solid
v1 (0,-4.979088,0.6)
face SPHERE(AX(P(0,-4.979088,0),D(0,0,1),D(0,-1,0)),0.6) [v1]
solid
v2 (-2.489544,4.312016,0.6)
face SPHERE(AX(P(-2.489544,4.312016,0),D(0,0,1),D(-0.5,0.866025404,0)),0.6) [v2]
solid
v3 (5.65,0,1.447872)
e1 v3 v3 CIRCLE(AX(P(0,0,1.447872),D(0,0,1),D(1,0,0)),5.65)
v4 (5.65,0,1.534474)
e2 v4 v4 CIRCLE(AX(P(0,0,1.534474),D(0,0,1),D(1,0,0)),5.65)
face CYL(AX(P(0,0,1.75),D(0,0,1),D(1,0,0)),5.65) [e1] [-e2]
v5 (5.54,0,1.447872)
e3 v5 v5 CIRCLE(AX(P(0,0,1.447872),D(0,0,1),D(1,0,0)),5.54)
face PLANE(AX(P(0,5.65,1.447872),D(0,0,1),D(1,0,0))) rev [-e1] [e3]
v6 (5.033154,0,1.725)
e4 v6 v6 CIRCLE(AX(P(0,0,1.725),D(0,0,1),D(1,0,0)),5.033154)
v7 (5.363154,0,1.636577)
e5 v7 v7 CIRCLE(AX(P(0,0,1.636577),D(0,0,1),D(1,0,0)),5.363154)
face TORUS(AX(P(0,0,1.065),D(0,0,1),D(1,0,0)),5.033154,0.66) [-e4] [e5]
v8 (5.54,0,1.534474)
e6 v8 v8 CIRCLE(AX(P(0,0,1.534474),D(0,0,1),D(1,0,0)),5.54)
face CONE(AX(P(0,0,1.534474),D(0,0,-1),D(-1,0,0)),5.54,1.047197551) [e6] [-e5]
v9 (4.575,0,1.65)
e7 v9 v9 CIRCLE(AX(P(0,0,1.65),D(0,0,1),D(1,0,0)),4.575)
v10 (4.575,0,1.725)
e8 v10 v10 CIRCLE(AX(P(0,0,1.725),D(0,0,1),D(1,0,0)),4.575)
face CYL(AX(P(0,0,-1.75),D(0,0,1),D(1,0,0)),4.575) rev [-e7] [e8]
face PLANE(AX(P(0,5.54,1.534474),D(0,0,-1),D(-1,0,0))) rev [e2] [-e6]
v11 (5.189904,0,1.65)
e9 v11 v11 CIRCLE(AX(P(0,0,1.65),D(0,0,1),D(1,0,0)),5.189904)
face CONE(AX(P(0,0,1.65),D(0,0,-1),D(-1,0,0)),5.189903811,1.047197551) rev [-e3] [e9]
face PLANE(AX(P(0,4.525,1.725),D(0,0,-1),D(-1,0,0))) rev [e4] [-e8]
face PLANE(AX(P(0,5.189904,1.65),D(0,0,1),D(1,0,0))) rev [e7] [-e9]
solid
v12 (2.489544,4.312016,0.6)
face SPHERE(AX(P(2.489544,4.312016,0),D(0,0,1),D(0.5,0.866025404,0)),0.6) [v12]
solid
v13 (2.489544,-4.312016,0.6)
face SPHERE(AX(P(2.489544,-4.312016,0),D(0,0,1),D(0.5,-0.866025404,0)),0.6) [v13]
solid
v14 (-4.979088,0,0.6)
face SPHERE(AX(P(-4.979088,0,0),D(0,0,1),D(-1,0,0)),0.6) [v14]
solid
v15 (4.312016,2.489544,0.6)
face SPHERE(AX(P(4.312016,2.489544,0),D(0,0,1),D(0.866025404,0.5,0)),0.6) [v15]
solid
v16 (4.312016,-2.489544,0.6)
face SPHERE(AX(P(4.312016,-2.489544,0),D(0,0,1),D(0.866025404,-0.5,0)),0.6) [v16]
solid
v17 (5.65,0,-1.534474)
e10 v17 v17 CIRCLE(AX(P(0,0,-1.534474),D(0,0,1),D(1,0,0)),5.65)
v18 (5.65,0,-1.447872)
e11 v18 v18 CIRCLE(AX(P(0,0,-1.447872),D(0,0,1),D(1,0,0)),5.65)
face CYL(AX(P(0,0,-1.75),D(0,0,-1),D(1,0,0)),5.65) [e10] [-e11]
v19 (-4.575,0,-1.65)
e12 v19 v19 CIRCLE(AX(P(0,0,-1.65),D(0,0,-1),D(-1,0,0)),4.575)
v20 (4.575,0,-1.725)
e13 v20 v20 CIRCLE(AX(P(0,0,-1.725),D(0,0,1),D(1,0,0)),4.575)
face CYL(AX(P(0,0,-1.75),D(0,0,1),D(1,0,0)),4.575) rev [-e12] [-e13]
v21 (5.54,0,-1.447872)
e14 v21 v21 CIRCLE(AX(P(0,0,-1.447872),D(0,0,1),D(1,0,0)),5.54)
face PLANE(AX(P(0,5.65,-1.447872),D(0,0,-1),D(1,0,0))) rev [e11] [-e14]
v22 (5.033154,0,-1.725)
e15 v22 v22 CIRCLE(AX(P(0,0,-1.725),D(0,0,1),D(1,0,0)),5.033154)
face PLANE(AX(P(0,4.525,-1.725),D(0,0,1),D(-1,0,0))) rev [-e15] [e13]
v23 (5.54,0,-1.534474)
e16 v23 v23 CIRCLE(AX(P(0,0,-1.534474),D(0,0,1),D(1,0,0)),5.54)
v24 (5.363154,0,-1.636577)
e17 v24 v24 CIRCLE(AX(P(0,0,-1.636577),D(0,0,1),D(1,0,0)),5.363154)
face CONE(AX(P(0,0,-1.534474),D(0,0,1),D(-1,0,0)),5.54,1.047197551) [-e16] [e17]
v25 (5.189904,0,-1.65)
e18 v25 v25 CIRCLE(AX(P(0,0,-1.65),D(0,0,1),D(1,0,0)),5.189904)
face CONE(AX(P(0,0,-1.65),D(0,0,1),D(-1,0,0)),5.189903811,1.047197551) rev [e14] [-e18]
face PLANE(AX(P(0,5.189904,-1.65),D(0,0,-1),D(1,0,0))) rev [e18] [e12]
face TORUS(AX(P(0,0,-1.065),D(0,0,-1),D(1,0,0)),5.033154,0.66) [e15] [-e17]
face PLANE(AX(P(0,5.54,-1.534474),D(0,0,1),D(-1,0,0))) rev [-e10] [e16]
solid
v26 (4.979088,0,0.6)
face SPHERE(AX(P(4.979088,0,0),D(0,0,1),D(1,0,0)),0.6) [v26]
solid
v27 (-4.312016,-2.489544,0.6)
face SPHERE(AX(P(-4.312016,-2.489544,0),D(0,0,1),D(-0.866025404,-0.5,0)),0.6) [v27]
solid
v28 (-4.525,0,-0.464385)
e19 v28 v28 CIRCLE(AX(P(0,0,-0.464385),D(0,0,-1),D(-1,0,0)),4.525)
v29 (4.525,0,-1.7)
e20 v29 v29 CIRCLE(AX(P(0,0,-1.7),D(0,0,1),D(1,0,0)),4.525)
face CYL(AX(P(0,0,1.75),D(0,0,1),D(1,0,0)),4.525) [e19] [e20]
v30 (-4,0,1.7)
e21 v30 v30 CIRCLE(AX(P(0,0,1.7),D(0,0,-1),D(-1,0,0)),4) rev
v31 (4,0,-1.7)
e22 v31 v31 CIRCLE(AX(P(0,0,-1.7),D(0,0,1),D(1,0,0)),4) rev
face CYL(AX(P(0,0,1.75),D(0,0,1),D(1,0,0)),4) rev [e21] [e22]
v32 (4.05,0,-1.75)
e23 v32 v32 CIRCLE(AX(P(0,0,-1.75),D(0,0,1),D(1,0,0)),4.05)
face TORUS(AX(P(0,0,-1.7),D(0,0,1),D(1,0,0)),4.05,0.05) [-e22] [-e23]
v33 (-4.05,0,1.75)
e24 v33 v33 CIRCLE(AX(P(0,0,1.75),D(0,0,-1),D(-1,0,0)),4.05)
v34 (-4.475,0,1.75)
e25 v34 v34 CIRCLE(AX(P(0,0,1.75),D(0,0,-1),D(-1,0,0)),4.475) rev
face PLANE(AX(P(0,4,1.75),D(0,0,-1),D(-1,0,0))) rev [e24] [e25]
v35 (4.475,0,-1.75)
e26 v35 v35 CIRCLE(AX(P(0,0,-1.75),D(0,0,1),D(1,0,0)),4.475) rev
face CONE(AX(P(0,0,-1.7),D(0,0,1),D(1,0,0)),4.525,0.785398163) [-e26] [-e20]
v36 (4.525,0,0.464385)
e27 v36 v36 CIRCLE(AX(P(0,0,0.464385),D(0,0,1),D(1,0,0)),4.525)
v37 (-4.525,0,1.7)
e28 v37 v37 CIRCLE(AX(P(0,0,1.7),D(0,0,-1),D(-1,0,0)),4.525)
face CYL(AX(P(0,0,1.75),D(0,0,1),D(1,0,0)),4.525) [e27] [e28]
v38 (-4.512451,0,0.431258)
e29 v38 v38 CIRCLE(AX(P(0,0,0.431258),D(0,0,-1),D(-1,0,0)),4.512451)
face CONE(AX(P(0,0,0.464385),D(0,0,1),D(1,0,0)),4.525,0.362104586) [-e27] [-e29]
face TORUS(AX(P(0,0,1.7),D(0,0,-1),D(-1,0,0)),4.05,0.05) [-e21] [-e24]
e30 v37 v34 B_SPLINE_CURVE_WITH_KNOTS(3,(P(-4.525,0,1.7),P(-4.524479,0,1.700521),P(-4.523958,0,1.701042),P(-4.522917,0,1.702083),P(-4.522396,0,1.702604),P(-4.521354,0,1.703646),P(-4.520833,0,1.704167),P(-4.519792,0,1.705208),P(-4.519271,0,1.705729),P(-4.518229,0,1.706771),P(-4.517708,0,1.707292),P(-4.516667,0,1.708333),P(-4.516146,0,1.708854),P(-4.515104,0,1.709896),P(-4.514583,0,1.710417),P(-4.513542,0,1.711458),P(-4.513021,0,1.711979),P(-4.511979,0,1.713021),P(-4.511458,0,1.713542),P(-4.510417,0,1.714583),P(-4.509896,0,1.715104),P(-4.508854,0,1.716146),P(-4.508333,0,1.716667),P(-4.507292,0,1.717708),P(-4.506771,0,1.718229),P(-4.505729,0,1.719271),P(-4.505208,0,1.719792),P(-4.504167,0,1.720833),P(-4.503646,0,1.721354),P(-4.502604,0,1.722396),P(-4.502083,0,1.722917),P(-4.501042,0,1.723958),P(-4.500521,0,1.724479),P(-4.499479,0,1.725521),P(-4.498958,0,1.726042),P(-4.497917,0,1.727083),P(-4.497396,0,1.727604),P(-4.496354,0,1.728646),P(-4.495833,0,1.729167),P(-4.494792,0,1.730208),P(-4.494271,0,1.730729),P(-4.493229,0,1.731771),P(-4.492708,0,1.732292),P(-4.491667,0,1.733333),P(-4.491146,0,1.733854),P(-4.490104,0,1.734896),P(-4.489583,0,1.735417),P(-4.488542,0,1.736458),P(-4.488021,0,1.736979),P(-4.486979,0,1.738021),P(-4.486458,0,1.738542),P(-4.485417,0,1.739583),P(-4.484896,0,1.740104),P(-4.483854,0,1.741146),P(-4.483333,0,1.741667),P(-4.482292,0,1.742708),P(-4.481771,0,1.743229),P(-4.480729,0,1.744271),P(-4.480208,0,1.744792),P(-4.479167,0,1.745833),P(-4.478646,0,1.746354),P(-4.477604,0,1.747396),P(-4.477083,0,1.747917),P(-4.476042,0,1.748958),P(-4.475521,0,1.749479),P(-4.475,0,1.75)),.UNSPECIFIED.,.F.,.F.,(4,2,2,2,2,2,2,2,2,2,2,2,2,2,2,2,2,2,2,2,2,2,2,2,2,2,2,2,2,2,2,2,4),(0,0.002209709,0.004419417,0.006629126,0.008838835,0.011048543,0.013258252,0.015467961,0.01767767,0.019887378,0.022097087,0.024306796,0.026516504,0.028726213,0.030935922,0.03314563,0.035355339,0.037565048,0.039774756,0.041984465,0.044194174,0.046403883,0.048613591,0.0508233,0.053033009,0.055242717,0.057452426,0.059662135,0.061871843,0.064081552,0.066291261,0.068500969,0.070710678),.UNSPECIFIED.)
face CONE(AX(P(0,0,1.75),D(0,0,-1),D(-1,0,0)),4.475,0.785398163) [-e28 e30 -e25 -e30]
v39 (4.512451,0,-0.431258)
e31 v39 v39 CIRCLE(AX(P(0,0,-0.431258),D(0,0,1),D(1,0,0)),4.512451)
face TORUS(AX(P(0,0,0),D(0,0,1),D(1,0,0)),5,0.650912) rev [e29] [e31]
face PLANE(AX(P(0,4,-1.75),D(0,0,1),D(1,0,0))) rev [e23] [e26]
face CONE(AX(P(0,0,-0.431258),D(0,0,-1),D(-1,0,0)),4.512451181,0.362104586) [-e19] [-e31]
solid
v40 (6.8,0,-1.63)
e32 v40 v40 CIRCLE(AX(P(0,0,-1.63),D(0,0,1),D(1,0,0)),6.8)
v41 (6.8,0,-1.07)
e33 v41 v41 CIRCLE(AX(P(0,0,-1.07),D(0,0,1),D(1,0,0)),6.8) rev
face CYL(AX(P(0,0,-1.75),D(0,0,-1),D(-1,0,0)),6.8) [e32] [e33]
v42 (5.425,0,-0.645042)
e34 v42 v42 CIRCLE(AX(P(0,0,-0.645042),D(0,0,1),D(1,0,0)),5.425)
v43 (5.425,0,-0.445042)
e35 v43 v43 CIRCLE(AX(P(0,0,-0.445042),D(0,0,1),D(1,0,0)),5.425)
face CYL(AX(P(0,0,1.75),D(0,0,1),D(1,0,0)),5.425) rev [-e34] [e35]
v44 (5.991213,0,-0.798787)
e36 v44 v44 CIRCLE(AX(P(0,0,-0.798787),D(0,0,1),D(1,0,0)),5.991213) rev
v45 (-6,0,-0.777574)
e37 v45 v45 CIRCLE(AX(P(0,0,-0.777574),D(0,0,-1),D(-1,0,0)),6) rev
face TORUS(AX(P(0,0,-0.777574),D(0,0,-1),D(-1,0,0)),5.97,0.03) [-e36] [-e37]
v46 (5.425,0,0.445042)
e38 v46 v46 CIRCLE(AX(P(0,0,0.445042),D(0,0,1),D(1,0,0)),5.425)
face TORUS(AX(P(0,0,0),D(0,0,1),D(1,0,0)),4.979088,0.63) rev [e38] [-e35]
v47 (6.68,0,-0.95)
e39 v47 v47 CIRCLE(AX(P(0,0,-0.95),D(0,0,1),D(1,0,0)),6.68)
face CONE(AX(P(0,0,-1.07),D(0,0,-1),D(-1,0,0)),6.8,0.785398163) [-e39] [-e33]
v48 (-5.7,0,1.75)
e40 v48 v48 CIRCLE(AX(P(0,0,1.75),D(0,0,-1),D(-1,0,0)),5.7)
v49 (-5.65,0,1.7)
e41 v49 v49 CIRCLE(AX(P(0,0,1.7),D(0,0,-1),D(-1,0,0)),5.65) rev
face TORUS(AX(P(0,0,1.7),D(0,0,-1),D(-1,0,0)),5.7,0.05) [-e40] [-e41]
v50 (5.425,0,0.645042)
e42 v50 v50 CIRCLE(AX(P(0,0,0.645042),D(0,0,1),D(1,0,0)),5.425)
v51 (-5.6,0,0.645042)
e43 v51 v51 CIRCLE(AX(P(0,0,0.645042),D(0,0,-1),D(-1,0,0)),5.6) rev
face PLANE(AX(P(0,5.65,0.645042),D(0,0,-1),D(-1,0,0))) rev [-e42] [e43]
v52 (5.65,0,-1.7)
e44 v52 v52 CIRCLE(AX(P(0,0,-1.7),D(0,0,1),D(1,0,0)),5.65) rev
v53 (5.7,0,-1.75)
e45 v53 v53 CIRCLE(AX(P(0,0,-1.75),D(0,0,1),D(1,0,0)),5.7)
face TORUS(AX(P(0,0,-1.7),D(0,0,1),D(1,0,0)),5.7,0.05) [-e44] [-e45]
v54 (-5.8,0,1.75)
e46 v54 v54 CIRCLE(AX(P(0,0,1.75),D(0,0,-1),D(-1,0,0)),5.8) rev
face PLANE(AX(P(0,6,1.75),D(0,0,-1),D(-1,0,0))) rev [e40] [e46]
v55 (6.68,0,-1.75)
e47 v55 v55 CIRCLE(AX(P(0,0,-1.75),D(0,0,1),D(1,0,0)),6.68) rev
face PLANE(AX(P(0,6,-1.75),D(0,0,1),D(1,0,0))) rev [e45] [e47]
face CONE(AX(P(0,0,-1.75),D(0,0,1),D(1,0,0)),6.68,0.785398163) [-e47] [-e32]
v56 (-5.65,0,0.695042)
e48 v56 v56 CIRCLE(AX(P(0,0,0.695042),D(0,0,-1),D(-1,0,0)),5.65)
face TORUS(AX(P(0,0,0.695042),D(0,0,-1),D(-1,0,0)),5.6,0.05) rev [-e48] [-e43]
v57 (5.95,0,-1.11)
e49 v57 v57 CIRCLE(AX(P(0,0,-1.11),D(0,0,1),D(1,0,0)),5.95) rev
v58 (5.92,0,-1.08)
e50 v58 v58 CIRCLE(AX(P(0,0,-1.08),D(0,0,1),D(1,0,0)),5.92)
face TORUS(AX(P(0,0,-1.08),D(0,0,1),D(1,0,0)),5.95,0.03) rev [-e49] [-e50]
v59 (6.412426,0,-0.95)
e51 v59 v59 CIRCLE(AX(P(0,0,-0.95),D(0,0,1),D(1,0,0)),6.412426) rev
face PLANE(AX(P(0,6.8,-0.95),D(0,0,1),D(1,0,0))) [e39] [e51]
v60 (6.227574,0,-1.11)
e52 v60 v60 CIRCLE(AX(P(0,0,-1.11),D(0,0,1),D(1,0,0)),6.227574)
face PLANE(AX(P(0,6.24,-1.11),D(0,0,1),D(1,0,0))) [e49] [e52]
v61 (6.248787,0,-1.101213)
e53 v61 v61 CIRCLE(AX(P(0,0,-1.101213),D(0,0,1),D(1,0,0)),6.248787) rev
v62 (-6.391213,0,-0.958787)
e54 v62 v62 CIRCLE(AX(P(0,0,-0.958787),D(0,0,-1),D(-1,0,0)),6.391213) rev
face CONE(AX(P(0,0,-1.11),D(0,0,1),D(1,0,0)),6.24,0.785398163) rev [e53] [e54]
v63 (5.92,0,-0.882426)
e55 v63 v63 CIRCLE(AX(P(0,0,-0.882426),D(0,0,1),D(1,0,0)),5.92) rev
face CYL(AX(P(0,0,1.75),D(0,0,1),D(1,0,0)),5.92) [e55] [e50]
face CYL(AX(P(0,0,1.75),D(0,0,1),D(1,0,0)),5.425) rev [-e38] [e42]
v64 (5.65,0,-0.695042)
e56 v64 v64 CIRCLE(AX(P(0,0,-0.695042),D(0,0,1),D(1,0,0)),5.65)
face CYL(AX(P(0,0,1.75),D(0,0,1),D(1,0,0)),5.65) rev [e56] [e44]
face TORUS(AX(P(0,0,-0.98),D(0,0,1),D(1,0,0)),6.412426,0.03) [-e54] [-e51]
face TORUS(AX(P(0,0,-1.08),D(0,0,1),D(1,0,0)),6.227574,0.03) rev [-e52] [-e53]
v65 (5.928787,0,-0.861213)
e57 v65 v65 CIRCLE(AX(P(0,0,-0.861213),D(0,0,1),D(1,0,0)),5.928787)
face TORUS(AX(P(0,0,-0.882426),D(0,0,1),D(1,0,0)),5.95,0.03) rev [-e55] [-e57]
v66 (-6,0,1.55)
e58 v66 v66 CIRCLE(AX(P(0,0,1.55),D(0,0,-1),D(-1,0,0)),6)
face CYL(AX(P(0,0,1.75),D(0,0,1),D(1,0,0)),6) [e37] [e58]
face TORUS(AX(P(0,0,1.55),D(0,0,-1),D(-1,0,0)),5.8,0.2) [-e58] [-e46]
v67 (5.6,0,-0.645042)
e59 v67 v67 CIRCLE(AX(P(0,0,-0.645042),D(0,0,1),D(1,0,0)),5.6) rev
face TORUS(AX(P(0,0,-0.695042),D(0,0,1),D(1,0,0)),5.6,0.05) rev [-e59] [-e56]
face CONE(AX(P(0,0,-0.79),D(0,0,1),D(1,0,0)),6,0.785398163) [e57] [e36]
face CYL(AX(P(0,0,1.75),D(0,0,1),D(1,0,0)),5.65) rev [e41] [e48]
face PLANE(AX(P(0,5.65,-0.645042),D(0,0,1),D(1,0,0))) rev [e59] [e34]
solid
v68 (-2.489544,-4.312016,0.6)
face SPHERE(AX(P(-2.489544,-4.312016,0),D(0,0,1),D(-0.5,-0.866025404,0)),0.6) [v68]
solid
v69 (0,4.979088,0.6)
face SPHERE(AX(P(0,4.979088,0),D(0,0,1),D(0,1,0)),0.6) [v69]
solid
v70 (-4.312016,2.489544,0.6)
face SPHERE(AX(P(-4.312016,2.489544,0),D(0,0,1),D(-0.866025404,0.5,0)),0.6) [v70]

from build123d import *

# Parameters (mm, degrees)
CIRPATTERN1_COUNT  = 12
SKETCH9_R          = 4.575
CUT_EXTRUDE1_DEPTH = 10.169276144
SKETCH7_W          = 0.8
SKETCH7_H          = 1.15
FILLET2_R          = 0.2
FILLET3_R          = 0.05
FILLET5_R          = 0.03
CHAMFER1_SIZE      = 0.12
FILLET7_R          = 0.05


with BuildPart() as part:
    # Sketch3 → Revolve1 (revolve)
    with BuildSketch(Plane(origin=(0, 0, 0), x_dir=(0, 0, -1), z_dir=(1, 0, 0)), mode=Mode.PRIVATE) as revolve1_sk:
        with BuildLine():
            Line((-1.75, 6), (-1.75, 5.65))
            Line((-1.75, 5.65), (-0.645041637, 5.65))
            Line((-0.645041637, 5.65), (-0.645041637, 5.425))
            Line((-0.645041637, 5.425), (-0.445041637, 5.425))
            ThreePointArc((-0.445041637, 5.425), (0, 5.609087518), (0.445041637, 5.425))
            Line((0.445041637, 5.425), (0.645041637, 5.425))
            Line((0.645041637, 5.425), (0.645041637, 5.65))
            Line((0.645041637, 5.65), (1.75, 5.65))
            Line((1.75, 5.65), (1.75, 6))
            Line((1.75, 6), (-1.75, 6))
        make_face()
        with BuildLine():
            Line((1.75, 4), (-1.75, 4))
            Line((-1.75, 4), (-1.75, 4.525))
            Line((-1.75, 4.525), (-0.445041637, 4.525))
            ThreePointArc((-0.445041637, 4.525), (0, 4.349087518), (0.445041637, 4.525))
            Line((0.445041637, 4.525), (1.75, 4.525))
            Line((1.75, 4.525), (1.75, 4))
        make_face()
    revolve(revolve1_sk.sketch.rotate(Axis((0, 0, 1.75), (0, 0, -1)), 90), axis=Axis((0, 0, 1.75), (0, 0, -1)))

    # Sketch7 → Revolve5 (revolve)
    with BuildSketch(Plane(origin=(0, 0, 0), x_dir=(0, 0, -1), z_dir=(1, 0, 0)), mode=Mode.PRIVATE) as revolve5_sk:
        with Locations((1.35, 6.225)):
            Rectangle(SKETCH7_W, SKETCH7_H)
    revolve(revolve5_sk.sketch.rotate(Axis((0, 0, -1.75), (0, 0, 1)), 270), axis=Axis((0, 0, -1.75), (0, 0, 1)))

    # Fillet2
    fillet2_edges = [part.edges().sort_by_distance(p)[0] for p in [
        (-6, 0, 1.75),
    ]]
    fillet(fillet2_edges, radius=FILLET2_R)

    # Fillet3
    fillet3_edges = [part.edges().sort_by_distance(p)[0] for p in [
        (-5.65, 0, 0.645041637),
        (-5.65, 0, 1.75),
        (-5.65, 0, -1.75),
        (-5.65, 0, -0.645041637),
    ]]
    fillet(fillet3_edges, radius=FILLET3_R)

    # Fillet6
    # the kernel refuses this chamfer: 0.05 mm, written as the material it takes off along each edge
    with BuildSketch(Plane(origin=(0, 0, 1.75), x_dir=(1, 0, 0), z_dir=(0, 1, 0))) as fillet6_piece_1:
        with BuildLine():
            Line((4.473585786, -0.001414214), (4.526414214, 0.051414214))
            Line((4.526414214, 0.051414214), (4.527414214, 0.051414214))
            ThreePointArc((4.527414214, 0.051414214), (4.526, 0.025707107), (4.526, 0))
            Line((4.526, 0), (4.525, -0.001))
            ThreePointArc((4.525, -0.001), (4.499292893, -0.001), (4.473585786, -0.002414214))
            Line((4.473585786, -0.002414214), (4.473585786, -0.001414214))
        make_face()
    revolve(axis=Axis((0, 0, 1.75), (0, 0, -1)), mode=Mode.SUBTRACT)
    with BuildSketch(Plane(origin=(0, 0, 0.445041637), x_dir=(1, 0, 0), z_dir=(0, 1, 0))) as fillet6_piece_2:
        with BuildLine():
            Line((4.525708486, -0.021213539), (4.511742694, 0.015654239))
            Line((4.511742694, 0.015654239), (4.512491718, 0.016316783))
            ThreePointArc((4.512491718, 0.016316783), (4.518790675, 0.008207779), (4.525729745, 0.00068372))
            Line((4.525729745, 0.00068372), (4.526, 0))
            ThreePointArc((4.526, 0), (4.526, -0.01060677), (4.526708486, -0.021213539))
            Line((4.526708486, -0.021213539), (4.525708486, -0.021213539))
        make_face()
    revolve(axis=Axis((0, 0, 0.445041637), (0, 0, -1)), mode=Mode.SUBTRACT)
    with BuildSketch(Plane(origin=(0, 0, -0.445041637), x_dir=(1, 0, 0), z_dir=(0, 1, 0))) as fillet6_piece_3:
        with BuildLine():
            Line((4.525708486, 0.021213539), (4.511742694, -0.015654239))
            Line((4.511742694, -0.015654239), (4.512491718, -0.016316783))
            ThreePointArc((4.512491718, -0.016316783), (4.518790675, -0.008207779), (4.525729745, -0.00068372))
            Line((4.525729745, -0.00068372), (4.526, 0))
            ThreePointArc((4.526, 0), (4.526, 0.01060677), (4.526708486, 0.021213539))
            Line((4.526708486, 0.021213539), (4.525708486, 0.021213539))
        make_face()
    revolve(axis=Axis((0, 0, -0.445041637), (0, 0, -1)), mode=Mode.SUBTRACT)
    with BuildSketch(Plane(origin=(0, 0, -1.75), x_dir=(1, 0, 0), z_dir=(0, 1, 0))) as fillet6_piece_4:
        with BuildLine():
            Line((4.526414214, -0.051414214), (4.473585786, 0.001414214))
            Line((4.473585786, 0.001414214), (4.473585786, 0.002414214))
            ThreePointArc((4.473585786, 0.002414214), (4.499292893, 0.001), (4.525, 0.001))
            Line((4.525, 0.001), (4.526, 0))
            ThreePointArc((4.526, 0), (4.526, -0.025707107), (4.527414214, -0.051414214))
            Line((4.527414214, -0.051414214), (4.526414214, -0.051414214))
        make_face()
    revolve(axis=Axis((0, 0, -1.75), (0, 0, -1)), mode=Mode.SUBTRACT)

    # Sketch8 → Cut-Revolve1 (revolve, cut)
    with BuildSketch(Plane(origin=(0, 0, 0), x_dir=(0, 0, -1), z_dir=(1, 0, 0)), mode=Mode.PRIVATE) as cut_revolve1_sk:
        Polygon((0.95, 6.4), (1.11, 6.24), (1.11, 5.92), (0.87, 5.92), (0.79, 6), (0.95, 6), align=None)
    revolve(cut_revolve1_sk.sketch.rotate(Axis((0, 0, 1.75), (0, 0, -1)), 270), axis=Axis((0, 0, 1.75), (0, 0, -1)), mode=Mode.SUBTRACT)

    # Fillet5
    fillet5_edges = [part.edges().sort_by_distance(p)[0] for p in [
        (6.4, 0, -0.95),
        (0, 6, -0.79),
        (5.92, 0, -0.87),
        (5.92, 0, -1.11),
        (6.24, 0, -1.11),
    ]]
    fillet(fillet5_edges, radius=FILLET5_R)

    # Chamfer1
    chamfer1_edges = [part.edges().sort_by_distance(p)[0] for p in [
        (-6.8, 0, -1.75),
        (-6.8, 0, -0.95),
    ]]
    chamfer(chamfer1_edges, length=CHAMFER1_SIZE)

    # Fillet7
    fillet7_edges = [part.edges().sort_by_distance(p)[0] for p in [
        (-4, 0, -1.75),
        (-4, 0, 1.75),
    ]]
    fillet(fillet7_edges, radius=FILLET7_R)


with BuildPart() as body_2:
    # Sketch5 → Revolve3 (revolve)
    with BuildSketch(Plane(origin=(0, 0, 0), x_dir=(0, 0, -1), z_dir=(1, 0, 0))):
        with BuildLine():
            Line((-0.6, 4.979087518), (0.6, 4.979087518))
            ThreePointArc((0.6, 4.979087518), (0, 5.579087518), (-0.6, 4.979087518))
        make_face()
    revolve(axis=Axis((0, 4.979087518, 0.6), (0, 0, -1)))


with BuildPart() as cirpattern1_1:
    # CirPattern1: pattern copy
    add(body_2.part.rotate(Axis((0, 0, 0), (0, 0, 1)), 1 * 360 / CIRPATTERN1_COUNT))


with BuildPart() as cirpattern1_2:
    # CirPattern1: pattern copy
    add(body_2.part.rotate(Axis((0, 0, 0), (0, 0, 1)), 2 * 360 / CIRPATTERN1_COUNT))


with BuildPart() as cirpattern1_3:
    # CirPattern1: pattern copy
    add(body_2.part.rotate(Axis((0, 0, 0), (0, 0, 1)), 3 * 360 / CIRPATTERN1_COUNT))


with BuildPart() as cirpattern1_4:
    # CirPattern1: pattern copy
    add(body_2.part.rotate(Axis((0, 0, 0), (0, 0, 1)), 4 * 360 / CIRPATTERN1_COUNT))


with BuildPart() as cirpattern1_5:
    # CirPattern1: pattern copy
    add(body_2.part.rotate(Axis((0, 0, 0), (0, 0, 1)), 5 * 360 / CIRPATTERN1_COUNT))


with BuildPart() as cirpattern1_6:
    # CirPattern1: pattern copy
    add(body_2.part.rotate(Axis((0, 0, 0), (0, 0, 1)), 6 * 360 / CIRPATTERN1_COUNT))


with BuildPart() as cirpattern1_7:
    # CirPattern1: pattern copy
    add(body_2.part.rotate(Axis((0, 0, 0), (0, 0, 1)), 7 * 360 / CIRPATTERN1_COUNT))


with BuildPart() as cirpattern1_8:
    # CirPattern1: pattern copy
    add(body_2.part.rotate(Axis((0, 0, 0), (0, 0, 1)), 8 * 360 / CIRPATTERN1_COUNT))


with BuildPart() as cirpattern1_9:
    # CirPattern1: pattern copy
    add(body_2.part.rotate(Axis((0, 0, 0), (0, 0, 1)), 9 * 360 / CIRPATTERN1_COUNT))


with BuildPart() as cirpattern1_10:
    # CirPattern1: pattern copy
    add(body_2.part.rotate(Axis((0, 0, 0), (0, 0, 1)), 10 * 360 / CIRPATTERN1_COUNT))


with BuildPart() as cirpattern1_11:
    # CirPattern1: pattern copy
    add(body_2.part.rotate(Axis((0, 0, 0), (0, 0, 1)), 11 * 360 / CIRPATTERN1_COUNT))


with BuildPart() as body_14:
    # Sketch6 → Revolve4 (revolve)
    with BuildSketch(Plane(origin=(0, 0, 0), x_dir=(0, 0, -1), z_dir=(1, 0, 0)), mode=Mode.PRIVATE) as revolve4_sk:
        with BuildLine():
            Line((-1.725, 4.525), (-1.725, 5.033153533))
            ThreePointArc((-1.725, 5.033153533), (-1.702511045, 5.203974103), (-1.636576766, 5.363153533))
            Line((-1.636576766, 5.363153533), (-1.534474411, 5.54))
            Line((-1.534474411, 5.54), (-1.534474411, 5.65))
            Line((-1.534474411, 5.65), (-1.447871871, 5.65))
            Line((-1.447871871, 5.65), (-1.447871871, 5.54))
            Line((-1.447871871, 5.54), (-1.65, 5.189903811))
            Line((-1.65, 5.189903811), (-1.65, 4.525))
            Line((-1.65, 4.525), (-1.725, 4.525))
        make_face()
    revolve(revolve4_sk.sketch.rotate(Axis((0, 0, 1.75), (0, 0, -1)), 90), axis=Axis((0, 0, 1.75), (0, 0, -1)))


with BuildPart() as body_15:
    # Mirror1: mirrored copy
    add(body_14.part.mirror(Plane.XY))


with BuildPart() as cut_extrude1_tool:
    # Sketch9 → Cut-Extrude1 (new, through all)
    with BuildSketch(Plane.XY.offset(1.725)):
        Circle(SKETCH9_R)
    extrude(amount=-CUT_EXTRUDE1_DEPTH)


with BuildPart() as body_14_1:
    add(body_14.part)

    # Cut-Extrude1: cut by cut_extrude1_tool
    add(cut_extrude1_tool.part, mode=Mode.SUBTRACT)


with BuildPart() as body_15_1:
    add(body_15.part)

    # Cut-Extrude1: cut by cut_extrude1_tool
    add(cut_extrude1_tool.part, mode=Mode.SUBTRACT)


solid = Compound([part.part, body_2.part, cirpattern1_1.part, cirpattern1_2.part, cirpattern1_3.part, cirpattern1_4.part, cirpattern1_5.part, cirpattern1_6.part, cirpattern1_7.part, cirpattern1_8.part, cirpattern1_9.part, cirpattern1_10.part, cirpattern1_11.part, body_14_1.part, body_15_1.part])
